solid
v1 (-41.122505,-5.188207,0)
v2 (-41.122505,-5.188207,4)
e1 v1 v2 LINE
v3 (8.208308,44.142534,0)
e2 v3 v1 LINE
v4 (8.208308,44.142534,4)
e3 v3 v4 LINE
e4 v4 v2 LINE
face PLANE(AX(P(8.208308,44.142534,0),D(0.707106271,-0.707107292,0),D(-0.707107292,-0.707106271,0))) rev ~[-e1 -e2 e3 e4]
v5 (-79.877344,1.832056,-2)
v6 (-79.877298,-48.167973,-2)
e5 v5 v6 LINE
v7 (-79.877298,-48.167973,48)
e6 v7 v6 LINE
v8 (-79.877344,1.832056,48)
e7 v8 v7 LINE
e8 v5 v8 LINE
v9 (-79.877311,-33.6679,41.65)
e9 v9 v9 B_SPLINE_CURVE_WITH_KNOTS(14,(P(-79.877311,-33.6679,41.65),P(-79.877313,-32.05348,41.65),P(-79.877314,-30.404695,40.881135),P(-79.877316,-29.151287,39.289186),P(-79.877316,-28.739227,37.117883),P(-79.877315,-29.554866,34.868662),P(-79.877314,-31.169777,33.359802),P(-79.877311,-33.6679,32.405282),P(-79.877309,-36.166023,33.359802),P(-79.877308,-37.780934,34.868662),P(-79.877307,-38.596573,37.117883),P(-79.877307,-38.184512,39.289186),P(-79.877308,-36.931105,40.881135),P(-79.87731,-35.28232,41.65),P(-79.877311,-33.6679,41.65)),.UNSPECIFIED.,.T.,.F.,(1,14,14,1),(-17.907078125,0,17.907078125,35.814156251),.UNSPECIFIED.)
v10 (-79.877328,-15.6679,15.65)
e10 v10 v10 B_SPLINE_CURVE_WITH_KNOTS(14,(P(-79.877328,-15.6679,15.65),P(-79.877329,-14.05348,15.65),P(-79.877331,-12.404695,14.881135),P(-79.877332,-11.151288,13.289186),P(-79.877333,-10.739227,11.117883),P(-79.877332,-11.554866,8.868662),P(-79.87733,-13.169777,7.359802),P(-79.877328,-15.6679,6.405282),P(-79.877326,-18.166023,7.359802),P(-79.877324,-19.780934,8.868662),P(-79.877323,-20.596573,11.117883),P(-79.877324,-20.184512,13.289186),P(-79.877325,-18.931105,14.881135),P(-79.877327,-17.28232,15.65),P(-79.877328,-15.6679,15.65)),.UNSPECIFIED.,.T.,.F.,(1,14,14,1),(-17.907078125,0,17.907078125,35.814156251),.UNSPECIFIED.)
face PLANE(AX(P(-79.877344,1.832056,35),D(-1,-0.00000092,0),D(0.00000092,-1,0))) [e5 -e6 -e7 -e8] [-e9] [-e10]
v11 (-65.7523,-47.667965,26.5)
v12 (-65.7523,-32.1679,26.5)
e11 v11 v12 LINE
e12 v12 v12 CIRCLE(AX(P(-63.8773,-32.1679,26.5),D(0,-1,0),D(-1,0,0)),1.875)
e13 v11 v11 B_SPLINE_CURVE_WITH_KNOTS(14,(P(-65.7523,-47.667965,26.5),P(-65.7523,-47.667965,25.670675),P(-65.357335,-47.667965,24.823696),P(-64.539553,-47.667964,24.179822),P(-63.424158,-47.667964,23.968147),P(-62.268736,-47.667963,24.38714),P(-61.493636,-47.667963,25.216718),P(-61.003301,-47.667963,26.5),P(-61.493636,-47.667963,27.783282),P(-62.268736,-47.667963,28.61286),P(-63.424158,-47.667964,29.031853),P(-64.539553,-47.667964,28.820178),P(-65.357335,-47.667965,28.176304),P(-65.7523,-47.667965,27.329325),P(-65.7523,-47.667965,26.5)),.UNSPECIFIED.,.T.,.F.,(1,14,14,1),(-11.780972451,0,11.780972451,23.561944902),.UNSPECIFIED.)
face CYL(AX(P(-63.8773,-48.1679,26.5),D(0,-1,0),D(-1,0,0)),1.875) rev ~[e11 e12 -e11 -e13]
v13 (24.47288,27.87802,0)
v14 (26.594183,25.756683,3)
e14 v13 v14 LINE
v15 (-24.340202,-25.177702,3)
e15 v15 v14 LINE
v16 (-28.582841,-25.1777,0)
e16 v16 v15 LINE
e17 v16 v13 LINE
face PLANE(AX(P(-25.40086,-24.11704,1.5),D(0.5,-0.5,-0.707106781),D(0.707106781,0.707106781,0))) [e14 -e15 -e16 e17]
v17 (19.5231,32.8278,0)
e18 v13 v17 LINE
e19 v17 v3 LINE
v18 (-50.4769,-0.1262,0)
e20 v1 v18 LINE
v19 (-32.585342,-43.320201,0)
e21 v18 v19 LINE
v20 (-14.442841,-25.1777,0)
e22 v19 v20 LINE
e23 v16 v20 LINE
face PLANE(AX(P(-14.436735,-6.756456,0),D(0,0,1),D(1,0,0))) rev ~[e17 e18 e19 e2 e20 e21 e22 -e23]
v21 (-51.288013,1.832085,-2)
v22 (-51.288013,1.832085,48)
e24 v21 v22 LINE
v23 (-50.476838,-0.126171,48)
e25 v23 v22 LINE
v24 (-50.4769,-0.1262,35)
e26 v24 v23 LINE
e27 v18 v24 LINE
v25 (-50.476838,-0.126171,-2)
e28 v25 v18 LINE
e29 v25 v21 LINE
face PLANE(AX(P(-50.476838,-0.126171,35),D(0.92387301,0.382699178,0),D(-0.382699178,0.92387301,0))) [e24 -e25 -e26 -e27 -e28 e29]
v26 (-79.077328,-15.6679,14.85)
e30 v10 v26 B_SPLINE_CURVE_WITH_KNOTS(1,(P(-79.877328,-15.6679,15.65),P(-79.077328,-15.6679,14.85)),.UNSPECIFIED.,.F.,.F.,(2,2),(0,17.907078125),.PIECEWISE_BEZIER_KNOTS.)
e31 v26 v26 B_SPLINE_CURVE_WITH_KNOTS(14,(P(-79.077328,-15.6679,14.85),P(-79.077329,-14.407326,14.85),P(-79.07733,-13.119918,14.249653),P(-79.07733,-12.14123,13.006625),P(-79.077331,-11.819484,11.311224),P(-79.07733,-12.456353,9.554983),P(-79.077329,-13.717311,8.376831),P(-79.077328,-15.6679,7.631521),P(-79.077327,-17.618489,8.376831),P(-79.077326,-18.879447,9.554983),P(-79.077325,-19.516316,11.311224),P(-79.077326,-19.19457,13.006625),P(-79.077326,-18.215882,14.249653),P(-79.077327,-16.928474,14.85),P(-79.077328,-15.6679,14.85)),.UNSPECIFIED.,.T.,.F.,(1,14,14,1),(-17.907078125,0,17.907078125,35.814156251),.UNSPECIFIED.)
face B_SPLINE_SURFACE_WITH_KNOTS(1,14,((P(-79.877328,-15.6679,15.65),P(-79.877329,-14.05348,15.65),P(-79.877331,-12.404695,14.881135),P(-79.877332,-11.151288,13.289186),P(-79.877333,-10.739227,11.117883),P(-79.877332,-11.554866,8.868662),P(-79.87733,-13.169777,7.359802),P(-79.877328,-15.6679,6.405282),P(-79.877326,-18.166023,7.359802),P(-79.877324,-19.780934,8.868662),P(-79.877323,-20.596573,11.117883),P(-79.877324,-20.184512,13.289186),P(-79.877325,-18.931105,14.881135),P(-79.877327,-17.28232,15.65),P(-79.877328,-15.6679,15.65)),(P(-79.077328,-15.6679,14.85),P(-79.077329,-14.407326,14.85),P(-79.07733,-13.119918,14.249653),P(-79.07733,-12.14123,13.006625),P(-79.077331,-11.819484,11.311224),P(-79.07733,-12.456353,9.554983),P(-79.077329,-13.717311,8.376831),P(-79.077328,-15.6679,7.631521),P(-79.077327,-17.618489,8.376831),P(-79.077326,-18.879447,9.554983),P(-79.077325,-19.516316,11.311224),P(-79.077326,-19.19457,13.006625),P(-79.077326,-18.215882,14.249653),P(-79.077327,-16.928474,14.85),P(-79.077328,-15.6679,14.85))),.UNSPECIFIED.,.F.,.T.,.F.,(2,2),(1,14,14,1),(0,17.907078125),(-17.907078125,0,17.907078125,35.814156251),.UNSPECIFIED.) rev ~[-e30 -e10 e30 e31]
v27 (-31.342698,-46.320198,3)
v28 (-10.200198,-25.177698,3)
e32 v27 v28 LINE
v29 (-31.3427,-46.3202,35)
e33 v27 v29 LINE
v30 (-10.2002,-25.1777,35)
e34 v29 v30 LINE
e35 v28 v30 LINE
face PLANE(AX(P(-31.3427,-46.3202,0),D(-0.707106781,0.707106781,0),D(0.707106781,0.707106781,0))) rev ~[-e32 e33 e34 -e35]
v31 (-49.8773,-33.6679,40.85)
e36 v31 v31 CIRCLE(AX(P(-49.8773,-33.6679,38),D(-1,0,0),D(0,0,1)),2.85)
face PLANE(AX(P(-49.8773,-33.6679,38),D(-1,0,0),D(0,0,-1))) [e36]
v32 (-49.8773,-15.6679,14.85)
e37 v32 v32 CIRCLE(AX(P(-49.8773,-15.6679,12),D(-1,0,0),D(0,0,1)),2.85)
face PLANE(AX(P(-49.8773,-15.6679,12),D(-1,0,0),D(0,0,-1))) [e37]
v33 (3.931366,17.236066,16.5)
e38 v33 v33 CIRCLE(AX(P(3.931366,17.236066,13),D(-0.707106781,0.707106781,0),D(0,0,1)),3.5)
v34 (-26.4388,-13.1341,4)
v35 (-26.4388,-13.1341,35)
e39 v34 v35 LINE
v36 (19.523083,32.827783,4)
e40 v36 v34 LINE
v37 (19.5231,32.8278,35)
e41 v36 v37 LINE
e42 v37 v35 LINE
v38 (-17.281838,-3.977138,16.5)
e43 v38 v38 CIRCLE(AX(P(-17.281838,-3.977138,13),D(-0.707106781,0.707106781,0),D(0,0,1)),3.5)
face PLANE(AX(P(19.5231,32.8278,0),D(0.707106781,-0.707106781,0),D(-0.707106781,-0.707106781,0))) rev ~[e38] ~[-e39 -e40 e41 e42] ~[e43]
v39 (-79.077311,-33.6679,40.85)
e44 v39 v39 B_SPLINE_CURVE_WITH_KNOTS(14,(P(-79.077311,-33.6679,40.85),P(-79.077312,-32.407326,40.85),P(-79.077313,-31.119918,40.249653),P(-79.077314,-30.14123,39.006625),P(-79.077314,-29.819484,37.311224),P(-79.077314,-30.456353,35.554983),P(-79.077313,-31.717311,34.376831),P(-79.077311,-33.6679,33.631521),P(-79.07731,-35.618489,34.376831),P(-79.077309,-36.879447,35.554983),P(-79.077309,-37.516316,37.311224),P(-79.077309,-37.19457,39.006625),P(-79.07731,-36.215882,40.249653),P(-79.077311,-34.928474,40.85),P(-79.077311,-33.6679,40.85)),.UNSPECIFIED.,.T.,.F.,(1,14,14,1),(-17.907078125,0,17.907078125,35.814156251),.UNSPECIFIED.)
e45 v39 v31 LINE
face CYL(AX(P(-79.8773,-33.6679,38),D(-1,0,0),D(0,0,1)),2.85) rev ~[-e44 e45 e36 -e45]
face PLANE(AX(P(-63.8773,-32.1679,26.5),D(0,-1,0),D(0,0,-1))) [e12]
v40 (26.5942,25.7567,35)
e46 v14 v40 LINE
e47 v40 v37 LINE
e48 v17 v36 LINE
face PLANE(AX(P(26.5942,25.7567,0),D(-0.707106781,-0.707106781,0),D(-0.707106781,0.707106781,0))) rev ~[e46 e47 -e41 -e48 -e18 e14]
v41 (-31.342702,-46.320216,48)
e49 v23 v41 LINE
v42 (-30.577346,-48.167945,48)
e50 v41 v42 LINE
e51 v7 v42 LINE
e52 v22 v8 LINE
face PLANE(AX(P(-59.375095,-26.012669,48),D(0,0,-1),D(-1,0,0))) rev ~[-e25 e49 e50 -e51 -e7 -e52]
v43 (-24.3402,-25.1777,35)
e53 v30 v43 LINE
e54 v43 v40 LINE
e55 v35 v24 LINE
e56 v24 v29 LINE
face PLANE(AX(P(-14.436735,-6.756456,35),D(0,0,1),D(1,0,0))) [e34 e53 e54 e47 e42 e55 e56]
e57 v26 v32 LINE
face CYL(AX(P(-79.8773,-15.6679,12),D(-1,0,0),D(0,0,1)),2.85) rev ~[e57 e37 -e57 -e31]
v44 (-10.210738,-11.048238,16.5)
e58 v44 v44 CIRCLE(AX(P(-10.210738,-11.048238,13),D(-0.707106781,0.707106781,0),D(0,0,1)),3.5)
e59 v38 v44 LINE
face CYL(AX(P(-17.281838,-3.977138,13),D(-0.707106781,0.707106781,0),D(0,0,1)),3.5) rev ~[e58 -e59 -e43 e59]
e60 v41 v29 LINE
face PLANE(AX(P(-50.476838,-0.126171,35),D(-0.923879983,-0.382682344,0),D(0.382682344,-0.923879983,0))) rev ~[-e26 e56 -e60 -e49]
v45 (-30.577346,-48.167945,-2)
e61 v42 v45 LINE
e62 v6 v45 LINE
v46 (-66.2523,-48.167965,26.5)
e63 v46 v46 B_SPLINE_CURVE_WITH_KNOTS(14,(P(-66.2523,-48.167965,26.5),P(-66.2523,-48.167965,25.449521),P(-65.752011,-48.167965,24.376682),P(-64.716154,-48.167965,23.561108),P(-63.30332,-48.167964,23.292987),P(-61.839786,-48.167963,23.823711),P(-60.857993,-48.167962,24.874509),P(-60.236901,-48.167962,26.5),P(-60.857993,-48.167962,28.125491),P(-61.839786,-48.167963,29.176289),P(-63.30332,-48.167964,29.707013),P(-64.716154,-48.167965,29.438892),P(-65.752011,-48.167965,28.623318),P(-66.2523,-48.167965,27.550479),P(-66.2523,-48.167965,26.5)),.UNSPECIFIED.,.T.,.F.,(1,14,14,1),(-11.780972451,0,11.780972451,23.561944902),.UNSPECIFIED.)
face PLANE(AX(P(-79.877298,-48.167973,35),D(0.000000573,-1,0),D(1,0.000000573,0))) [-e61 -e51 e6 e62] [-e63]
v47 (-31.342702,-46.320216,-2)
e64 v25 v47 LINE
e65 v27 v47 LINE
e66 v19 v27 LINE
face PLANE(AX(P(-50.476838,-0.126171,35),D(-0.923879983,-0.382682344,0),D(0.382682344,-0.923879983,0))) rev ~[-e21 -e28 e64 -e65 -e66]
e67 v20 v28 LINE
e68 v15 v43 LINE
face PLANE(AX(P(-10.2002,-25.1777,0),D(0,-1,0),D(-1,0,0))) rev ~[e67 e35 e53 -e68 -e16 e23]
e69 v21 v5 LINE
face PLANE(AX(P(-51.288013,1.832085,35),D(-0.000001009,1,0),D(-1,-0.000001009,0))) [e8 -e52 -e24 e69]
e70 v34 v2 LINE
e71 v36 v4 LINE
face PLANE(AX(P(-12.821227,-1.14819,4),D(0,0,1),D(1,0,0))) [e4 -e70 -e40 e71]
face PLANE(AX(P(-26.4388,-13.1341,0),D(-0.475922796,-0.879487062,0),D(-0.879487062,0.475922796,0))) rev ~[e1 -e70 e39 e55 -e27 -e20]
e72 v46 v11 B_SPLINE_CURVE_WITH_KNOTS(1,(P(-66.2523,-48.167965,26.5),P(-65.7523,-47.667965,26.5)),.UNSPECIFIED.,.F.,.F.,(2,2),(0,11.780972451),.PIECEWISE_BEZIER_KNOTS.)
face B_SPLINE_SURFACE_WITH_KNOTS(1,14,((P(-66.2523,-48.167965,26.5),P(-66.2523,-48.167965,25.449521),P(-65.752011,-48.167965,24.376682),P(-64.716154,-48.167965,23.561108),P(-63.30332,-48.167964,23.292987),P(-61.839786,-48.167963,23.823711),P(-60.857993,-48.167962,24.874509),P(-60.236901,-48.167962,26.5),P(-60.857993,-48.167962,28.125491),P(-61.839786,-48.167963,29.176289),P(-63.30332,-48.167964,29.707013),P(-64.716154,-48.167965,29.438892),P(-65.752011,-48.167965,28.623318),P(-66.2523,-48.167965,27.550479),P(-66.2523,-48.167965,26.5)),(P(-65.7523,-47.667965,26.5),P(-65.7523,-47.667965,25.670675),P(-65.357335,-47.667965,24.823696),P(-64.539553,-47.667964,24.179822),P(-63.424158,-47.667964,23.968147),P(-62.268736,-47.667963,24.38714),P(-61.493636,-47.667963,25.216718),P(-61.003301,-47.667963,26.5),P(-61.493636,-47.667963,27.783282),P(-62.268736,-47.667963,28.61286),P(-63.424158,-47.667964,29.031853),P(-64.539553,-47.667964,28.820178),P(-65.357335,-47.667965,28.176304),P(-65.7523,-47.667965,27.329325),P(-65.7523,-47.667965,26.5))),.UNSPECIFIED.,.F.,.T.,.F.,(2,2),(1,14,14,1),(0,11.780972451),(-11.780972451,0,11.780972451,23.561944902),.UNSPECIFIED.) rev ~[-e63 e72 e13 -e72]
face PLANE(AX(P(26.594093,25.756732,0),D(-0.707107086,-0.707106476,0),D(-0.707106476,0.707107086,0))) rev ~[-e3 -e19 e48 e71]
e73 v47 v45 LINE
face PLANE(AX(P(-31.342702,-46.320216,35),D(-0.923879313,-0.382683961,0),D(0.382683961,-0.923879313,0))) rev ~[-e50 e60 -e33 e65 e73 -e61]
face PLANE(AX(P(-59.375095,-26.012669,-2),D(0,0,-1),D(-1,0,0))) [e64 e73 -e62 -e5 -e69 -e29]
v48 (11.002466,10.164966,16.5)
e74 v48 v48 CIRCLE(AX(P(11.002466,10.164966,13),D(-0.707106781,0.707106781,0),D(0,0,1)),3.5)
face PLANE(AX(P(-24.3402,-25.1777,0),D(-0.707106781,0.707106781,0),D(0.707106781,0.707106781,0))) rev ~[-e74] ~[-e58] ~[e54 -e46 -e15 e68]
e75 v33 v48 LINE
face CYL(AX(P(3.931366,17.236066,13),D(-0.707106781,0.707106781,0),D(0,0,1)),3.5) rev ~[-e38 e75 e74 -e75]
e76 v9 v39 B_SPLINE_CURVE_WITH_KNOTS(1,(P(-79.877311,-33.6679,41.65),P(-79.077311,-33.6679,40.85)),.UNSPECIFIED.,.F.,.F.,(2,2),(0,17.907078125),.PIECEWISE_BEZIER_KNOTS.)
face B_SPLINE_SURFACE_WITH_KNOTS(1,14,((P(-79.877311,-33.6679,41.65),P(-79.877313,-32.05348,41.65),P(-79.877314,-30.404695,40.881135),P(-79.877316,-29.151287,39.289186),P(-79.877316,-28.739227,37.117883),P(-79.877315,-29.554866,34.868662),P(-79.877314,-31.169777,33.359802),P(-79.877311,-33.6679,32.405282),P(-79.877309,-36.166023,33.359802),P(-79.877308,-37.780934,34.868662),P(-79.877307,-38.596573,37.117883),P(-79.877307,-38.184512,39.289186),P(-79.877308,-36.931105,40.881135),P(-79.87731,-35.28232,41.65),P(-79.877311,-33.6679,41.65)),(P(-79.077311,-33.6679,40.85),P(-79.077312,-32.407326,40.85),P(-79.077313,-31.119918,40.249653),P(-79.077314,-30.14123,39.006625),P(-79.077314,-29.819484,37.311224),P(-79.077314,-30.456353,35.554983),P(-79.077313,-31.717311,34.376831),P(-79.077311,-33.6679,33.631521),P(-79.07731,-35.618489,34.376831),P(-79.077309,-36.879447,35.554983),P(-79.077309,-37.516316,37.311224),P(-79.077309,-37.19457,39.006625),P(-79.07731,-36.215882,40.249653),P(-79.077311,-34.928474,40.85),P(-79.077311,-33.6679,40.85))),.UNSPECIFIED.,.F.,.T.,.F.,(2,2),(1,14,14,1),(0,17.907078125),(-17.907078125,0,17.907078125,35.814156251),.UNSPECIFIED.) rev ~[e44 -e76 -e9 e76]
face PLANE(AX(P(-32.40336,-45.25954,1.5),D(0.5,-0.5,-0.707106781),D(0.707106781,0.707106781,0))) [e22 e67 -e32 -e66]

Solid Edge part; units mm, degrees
sketch "Sketch1" plane through (0, 0, 0) normal (0, 0, 1) x (1, 0, 0)
  line L0 (-50.4769, -0.1262) -> (-31.3427, -46.3202)
  line L1 (-31.3427, -46.3202) -> (-10.2002, -25.1777)
  line L2 (-10.2002, -25.1777) -> (-24.3402, -25.1777)
  line L3 (-24.3402, -25.1777) -> (26.5942, 25.7567)
  line L4 (26.5942, 25.7567) -> (19.5231, 32.8278)
  line L5 (19.5231, 32.8278) -> (-26.4388, -13.1341)
  line L6 (-26.4388, -13.1341) -> (-50.4769, -0.1262)
  dimension "D1" = 50
  dimension "D2" = 29.9
  dimension "D3" = 10
  dimension "D4" = 65
  dimension "D5" = 14.14
  dimension "D6" = 70
extrude "Protrusion1" add sketch "Sketch1" along normal blind 35
sketch "Sketch2" plane through (-12.0121, -6.8169, 0) normal (0, 0, -1) x (-0.8794859, 0.4759249, 0)
  line L0 (-1.7996, -43.9425) -> (-10.3318, -15.2857)
  line L1 (-10.3318, -15.2857) -> (2.1041, -22.0153)
  line L2 (2.1041, -22.0153) -> (-18.451, 47.0217)
  line L3 (-18.451, 47.0217) -> (6.4693, 54.4415)
  line L4 (6.4693, 54.4415) -> (28.4484, -19.3779)
  line L5 (28.4484, -19.3779) -> (-1.7996, -43.9425)
  dimension "D1" = 36
extrude "Extrusionsausprägung_6" add sketch "Sketch2" against normal blind 4
sketch "Sketch3" plane through (-3.4579, 9.8468, 19.5) normal (-0.7071068, 0.7071068, 0) x (0, 0, 1)
  circle A0 centre (-6.5, 10.45) radius 3.5
  circle A1 centre (-6.5, -19.55) radius 3.5
  dimension "D1" = 7
  dimension "D2" = 22.05
  dimension "D3" = 13
  dimension "D4" = 30
extrude "Cutout1" cut sketch "Sketch3" against normal through all
sketch "Sketch4" plane through (-11.9413, -6.7462, 35) normal (0, 0, 1) x (0.8794859, -0.4759249, 0)
  line L0 (-37.0421, -12.5178) -> (1.771, -44.0384)
  line L1 (1.771, -44.0384) -> (3.3235, -45.2992)
  line L2 (-40.0351, -68.7623) -> (3.3235, -45.2992)
  line L3 (-63.8314, -24.788) -> (-40.0351, -68.7623)
  line L4 (-38.6875, -11.1816) -> (-63.8314, -24.788)
  line L5 (-37.0421, -12.5178) -> (-38.6875, -11.1816)
  dimension "D1" = 50
  dimension "D2" = 49.3
  dimension "D3" = 2
extrude "Extrusionsausprägung_7" add sketch "Sketch4" against normal blind 37 and the other way blind 13
chamfer "Fase_3" distance 3 angle 45 2 edges at (1.127, 0.2895, 0) (-20.7715, -35.7489, 0)
sketch "Sketch5" plane through (-55.2273, -48.1679, 23) normal (0, -1, 0) x (-1, 0, 0)
  circle A0 centre (8.65, -3.5) radius 1.875
  dimension "D1" = 3.75
  dimension "D2" = 16
  dimension "D3" = 21.5
extrude "Extrusionsausschnitt_6" cut sketch "Sketch5" against normal blind 16
chamfer "Fase_4" distance 0.5 angle 45 1 edges at (-62.0023, -48.1679, 26.5)
sketch "Sketch6" plane through (-79.8773, -23.1679, 23) normal (-1, 0, 0) x (0, 0, 1)
  circle A0 centre (-11, 7.5) radius 2.85
  circle A1 centre (15, -10.5) radius 2.85
  dimension "D1" = 5.7
  dimension "D2" = 14.5
  dimension "D3" = 10
  dimension "D4" = 26
  dimension "D5" = 18
extrude "Extrusionsausschnitt_7" cut sketch "Sketch6" against normal blind 30
chamfer "Fase_5" distance 0.8 angle 45 2 edges at (-79.8773, -15.6679, 9.15) (-79.8773, -33.6679, 35.15)
properties material "Nylon, allgemein"
